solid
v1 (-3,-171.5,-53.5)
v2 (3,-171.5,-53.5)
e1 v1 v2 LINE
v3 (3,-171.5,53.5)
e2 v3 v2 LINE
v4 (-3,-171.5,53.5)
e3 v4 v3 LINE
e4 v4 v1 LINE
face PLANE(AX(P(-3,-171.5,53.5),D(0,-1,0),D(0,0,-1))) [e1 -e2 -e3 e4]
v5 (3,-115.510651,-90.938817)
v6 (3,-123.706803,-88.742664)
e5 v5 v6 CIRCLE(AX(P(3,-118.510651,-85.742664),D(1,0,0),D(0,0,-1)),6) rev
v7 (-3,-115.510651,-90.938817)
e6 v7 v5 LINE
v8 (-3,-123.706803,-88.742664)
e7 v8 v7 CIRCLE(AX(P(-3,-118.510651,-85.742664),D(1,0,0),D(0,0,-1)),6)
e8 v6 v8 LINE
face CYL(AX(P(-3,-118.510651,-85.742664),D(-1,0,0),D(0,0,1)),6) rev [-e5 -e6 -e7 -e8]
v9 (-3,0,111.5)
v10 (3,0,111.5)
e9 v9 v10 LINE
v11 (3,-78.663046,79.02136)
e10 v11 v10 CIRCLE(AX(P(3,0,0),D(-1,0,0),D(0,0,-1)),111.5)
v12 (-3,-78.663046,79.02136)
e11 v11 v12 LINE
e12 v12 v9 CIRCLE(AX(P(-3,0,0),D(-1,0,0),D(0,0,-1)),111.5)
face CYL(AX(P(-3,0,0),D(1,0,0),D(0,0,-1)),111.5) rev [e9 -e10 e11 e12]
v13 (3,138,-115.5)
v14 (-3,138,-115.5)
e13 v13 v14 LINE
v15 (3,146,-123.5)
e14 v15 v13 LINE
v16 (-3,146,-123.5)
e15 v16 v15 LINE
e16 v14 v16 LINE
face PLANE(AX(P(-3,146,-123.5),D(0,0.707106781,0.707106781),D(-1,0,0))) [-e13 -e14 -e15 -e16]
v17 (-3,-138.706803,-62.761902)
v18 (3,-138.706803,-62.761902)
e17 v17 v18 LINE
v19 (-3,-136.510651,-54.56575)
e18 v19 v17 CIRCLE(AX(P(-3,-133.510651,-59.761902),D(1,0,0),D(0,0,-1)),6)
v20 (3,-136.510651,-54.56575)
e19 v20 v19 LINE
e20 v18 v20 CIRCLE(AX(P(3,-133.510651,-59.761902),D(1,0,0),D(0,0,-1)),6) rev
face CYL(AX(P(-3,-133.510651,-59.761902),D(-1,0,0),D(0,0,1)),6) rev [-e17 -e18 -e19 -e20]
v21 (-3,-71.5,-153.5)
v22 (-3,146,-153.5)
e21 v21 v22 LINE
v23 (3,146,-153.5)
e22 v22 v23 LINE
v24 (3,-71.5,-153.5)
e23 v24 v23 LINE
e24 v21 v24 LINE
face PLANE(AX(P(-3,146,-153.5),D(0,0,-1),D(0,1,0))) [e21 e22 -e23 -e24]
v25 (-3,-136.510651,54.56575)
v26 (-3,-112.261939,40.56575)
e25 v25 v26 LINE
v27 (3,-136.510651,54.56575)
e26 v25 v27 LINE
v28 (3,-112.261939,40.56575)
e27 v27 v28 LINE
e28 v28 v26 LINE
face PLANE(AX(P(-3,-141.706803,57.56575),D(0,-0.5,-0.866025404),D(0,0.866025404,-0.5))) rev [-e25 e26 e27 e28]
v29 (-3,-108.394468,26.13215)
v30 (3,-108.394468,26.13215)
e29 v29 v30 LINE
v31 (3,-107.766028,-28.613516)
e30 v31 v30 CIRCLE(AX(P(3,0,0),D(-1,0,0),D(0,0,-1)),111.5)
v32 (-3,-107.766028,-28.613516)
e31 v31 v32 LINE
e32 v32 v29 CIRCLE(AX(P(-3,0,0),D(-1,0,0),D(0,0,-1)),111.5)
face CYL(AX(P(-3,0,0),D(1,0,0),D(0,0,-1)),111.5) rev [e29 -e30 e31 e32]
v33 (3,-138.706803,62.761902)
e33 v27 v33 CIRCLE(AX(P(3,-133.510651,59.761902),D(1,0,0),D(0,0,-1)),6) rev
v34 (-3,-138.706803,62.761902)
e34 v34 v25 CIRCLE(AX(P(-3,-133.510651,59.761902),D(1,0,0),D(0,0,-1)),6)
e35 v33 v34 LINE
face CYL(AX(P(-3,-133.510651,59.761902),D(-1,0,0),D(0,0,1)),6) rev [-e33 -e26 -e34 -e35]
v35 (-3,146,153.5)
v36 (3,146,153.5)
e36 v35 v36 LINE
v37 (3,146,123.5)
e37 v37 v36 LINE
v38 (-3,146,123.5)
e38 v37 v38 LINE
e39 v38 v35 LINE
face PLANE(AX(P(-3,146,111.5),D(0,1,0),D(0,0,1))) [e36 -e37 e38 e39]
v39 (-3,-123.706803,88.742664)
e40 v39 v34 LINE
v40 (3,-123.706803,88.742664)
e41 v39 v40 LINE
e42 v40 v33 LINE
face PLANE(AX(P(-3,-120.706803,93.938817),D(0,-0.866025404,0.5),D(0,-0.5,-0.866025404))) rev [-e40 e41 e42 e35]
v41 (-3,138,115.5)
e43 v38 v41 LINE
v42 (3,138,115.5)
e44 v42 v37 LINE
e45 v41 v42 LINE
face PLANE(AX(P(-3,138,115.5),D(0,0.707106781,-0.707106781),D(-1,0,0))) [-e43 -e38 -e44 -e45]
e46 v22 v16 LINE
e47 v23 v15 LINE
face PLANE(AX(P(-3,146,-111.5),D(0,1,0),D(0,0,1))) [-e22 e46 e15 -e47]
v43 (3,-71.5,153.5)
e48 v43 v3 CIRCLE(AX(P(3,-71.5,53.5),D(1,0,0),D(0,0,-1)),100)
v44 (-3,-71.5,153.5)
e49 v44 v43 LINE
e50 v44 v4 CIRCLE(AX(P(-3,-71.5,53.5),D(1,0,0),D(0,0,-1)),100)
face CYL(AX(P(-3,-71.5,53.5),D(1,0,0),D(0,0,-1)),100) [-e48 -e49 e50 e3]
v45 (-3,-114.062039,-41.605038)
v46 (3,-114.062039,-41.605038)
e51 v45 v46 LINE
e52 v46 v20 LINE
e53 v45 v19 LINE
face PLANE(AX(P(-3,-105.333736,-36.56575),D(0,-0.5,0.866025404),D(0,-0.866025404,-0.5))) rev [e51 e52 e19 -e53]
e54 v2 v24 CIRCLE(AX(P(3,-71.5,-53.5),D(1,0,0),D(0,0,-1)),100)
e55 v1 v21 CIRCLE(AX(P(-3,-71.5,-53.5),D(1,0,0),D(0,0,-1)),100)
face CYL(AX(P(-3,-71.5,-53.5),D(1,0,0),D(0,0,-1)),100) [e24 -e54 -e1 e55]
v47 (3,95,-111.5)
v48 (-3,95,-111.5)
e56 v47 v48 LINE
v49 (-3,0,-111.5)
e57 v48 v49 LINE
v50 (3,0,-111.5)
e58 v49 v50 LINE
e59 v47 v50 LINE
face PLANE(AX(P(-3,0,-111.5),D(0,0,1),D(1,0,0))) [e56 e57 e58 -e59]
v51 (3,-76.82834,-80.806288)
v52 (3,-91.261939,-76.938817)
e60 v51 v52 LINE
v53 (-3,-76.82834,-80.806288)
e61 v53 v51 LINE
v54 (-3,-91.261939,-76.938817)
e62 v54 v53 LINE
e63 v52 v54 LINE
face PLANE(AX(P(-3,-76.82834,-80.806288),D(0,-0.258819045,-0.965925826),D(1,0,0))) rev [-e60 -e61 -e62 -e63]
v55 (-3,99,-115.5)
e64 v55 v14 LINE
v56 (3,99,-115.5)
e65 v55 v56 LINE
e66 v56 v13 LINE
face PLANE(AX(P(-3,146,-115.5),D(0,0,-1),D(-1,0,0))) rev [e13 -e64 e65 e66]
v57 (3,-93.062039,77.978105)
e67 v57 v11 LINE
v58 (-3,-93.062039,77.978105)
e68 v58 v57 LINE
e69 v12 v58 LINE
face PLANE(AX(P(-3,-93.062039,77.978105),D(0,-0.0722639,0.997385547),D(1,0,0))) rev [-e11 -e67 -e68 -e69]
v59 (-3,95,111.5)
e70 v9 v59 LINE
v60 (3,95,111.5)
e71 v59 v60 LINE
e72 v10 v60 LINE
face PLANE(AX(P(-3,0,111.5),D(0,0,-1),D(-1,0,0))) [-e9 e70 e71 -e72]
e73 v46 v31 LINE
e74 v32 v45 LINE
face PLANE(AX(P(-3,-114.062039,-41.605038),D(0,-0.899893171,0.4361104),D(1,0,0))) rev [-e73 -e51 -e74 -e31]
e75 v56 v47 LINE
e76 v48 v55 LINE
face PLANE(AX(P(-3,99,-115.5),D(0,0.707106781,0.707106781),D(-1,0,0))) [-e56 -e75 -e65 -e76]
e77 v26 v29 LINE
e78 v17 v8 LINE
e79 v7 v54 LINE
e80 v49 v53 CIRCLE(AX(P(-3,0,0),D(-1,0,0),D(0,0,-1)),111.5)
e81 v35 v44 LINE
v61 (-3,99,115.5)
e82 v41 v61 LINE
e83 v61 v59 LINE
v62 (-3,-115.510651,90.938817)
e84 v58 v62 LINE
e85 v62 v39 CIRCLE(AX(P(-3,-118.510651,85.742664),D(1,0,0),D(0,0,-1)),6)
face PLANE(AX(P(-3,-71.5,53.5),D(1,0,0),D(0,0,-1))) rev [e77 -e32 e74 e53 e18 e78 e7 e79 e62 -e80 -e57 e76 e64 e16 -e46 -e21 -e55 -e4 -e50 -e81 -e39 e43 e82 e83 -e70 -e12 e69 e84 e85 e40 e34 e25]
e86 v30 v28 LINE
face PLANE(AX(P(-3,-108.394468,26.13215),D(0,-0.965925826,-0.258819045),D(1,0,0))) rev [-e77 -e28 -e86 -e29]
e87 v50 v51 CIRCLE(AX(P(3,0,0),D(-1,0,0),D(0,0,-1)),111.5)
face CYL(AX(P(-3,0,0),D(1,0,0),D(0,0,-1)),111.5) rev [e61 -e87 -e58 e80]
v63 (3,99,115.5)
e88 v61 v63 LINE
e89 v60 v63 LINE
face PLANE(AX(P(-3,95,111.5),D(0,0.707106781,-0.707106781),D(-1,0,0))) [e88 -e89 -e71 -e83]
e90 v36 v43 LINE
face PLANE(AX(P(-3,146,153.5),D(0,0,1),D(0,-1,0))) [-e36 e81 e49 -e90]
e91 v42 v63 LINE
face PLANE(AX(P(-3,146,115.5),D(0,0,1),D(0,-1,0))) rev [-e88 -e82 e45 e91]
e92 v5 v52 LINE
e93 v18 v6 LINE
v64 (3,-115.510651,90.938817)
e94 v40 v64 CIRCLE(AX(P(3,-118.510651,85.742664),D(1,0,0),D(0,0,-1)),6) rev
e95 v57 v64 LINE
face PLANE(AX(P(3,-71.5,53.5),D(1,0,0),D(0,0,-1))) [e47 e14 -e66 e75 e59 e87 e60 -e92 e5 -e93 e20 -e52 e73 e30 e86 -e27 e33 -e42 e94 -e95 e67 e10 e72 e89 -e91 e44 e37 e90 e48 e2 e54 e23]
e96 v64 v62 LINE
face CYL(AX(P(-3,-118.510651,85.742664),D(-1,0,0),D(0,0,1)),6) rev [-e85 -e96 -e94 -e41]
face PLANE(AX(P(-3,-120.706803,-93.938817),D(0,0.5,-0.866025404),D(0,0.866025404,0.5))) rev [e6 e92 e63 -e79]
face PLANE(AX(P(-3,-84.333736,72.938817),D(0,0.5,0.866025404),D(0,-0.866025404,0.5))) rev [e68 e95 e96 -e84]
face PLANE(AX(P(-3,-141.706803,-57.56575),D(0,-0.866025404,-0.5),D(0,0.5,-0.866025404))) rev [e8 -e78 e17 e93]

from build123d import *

# Parameters (mm, degrees)
SM_START                 = -3
SM_BASE_FLANGE_1_DEPTH   = 6
CUT_EXTRUDE_1_DEPTH      = 231.181450165
CUT_EXTRUDE_1_DEPTH_BACK = 231.181450165
SKETCH_7_W               = 4
SKETCH_7_H               = 47
CHAMFER_2_SIZE           = 8
CHAMFER_2_SIZE_2         = 10.078576046
FILLET_1_R               = 6
CHAMFER_3_SIZE           = 4


with BuildPart() as part:
    # Базовая кромка1: read off the stored shape, not the designer's step
    # Базовая кромка1 outline → Базовая кромка1 (new body)
    with BuildSketch(Plane(origin=(0, 0, 0), x_dir=(0, 0, -1), z_dir=(1, 0, 0)).offset(SM_START)):
        with BuildLine():
            Line((-111.5, 0), (-111.5, 146))
            Line((-111.5, 146), (-153.5, 146))
            Line((-153.5, 146), (-153.5, -71.5))
            ThreePointArc((-153.5, -71.5), (-124.210678119, -142.210678119), (-53.5, -171.5))
            Line((-53.5, -171.5), (53.5, -171.5))
            ThreePointArc((53.5, -171.5), (124.210678119, -142.210678119), (153.5, -71.5))
            Line((153.5, -71.5), (153.5, 146))
            Line((153.5, 146), (111.5, 146))
            Line((111.5, 146), (111.5, 0))
            ThreePointArc((111.5, 0), (0, -111.5), (-111.5, 0))
        make_face()
    extrude(amount=SM_BASE_FLANGE_1_DEPTH)

    # Эскиз7 → Вырез-Вытянуть1 (cut, two sides: drawn at the far end of the back side and taken through both)
    with BuildSketch(Plane(origin=(0, 0, 0), x_dir=(0, 0, -1), z_dir=(1, 0, 0)).offset(-CUT_EXTRUDE_1_DEPTH_BACK)):
        Polygon((72.938816537, -84.333736086), (36.565749578, -105.333736086), (57.565749578, -141.706803045), (93.938816537, -120.706803045), align=None)
        Polygon((-72.938816537, -84.333736086), (-93.938816537, -120.706803045), (-57.565749578, -141.706803045), (-36.565749578, -105.333736086), align=None)
        with Locations((-113.5, 122.5)):
            Rectangle(SKETCH_7_W, SKETCH_7_H)
        with Locations((113.5, 122.5)):
            Rectangle(SKETCH_7_W, SKETCH_7_H)
    extrude(amount=CUT_EXTRUDE_1_DEPTH + CUT_EXTRUDE_1_DEPTH_BACK, mode=Mode.SUBTRACT)

    # Фаска2
    # the kernel refuses this chamfer: 10.078576046, 8 mm, written as the material it takes off along each edge
    with BuildSketch(Plane(origin=(23.573463904, 146, -115.5), x_dir=(0, -1, 0), z_dir=(-1, 0, 0))) as chamfer_2_piece_1:
        Polygon((CHAMFER_2_SIZE, 0), (0, -CHAMFER_2_SIZE), (0, 0), align=None)
    extrude(amount=47.146927807, mode=Mode.SUBTRACT)
    with BuildSketch(Plane(origin=(-23.573463904, 146, 115.5), x_dir=(0, 0, 1), z_dir=(1, 0, 0))) as chamfer_2_piece_2:
        Polygon((CHAMFER_2_SIZE, 0), (0, CHAMFER_2_SIZE), (0, 0), align=None)
    extrude(amount=47.146927807, mode=Mode.SUBTRACT)
    with BuildSketch(Plane(origin=(31.048807118, -84.333736086, -72.938816537), x_dir=(0, -0.8660254037844384, -0.5000000000000006), z_dir=(-1, 0, 0)), Plane(origin=(31.048807118, -105.333736086, 36.565749578), x_dir=(0, -0.8660254037844385, 0.5000000000000004), z_dir=(-1, 0, 0))) as chamfer_2_piece_3:
        with BuildLine():
            Line((CHAMFER_2_SIZE, 0), (-2.56612789, -10.56612789))
            ThreePointArc((-2.56612789, -10.56612789), (-1.195031672, -5.481970258), (0, 0))
            Line((0, 0), (CHAMFER_2_SIZE, 0))
        make_face()
    extrude(amount=62.097614236, mode=Mode.SUBTRACT)
    with BuildSketch(Plane(origin=(-29.036718462, -105.333736086, -36.565749578), x_dir=(0, -0.2924871420802376, 0.9562694556022036), z_dir=(1, 0, 0))) as chamfer_2_piece_4:
        with BuildLine():
            Line((8.31589202, 0), (-CHAMFER_2_SIZE_2 * 0.224833432478, CHAMFER_2_SIZE_2 * 0.974397212447))
            Line((-CHAMFER_2_SIZE_2 * 0.224833432478, CHAMFER_2_SIZE_2 * 0.974397212447), (0, 0))
            ThreePointArc((0, 0), (4.305979523, 0.077455676), (8.31589202, 0))
        make_face()
    extrude(amount=58.073436924, mode=Mode.SUBTRACT)
    with BuildSketch(Plane(origin=(29.036718462, -84.333736086, 72.938816537), x_dir=(0, 0.6819100703745066, 0.7314360231228946), z_dir=(-1, 0, 0))) as chamfer_2_piece_5:
        with BuildLine():
            Line((8.31589202, 0), (-CHAMFER_2_SIZE_2 * 0.224833432478, -CHAMFER_2_SIZE_2 * 0.974397212447))
            Line((-CHAMFER_2_SIZE_2 * 0.224833432478, -CHAMFER_2_SIZE_2 * 0.974397212447), (0, 0))
            ThreePointArc((0, 0), (4.305979523, -0.077455676), (8.31589202, 0))
        make_face()
    extrude(amount=58.073436924, mode=Mode.SUBTRACT)

    # Скругление1
    fillet_1_edges = [part.edges().sort_by_distance(p)[0] for p in [
        (0, -120.706803045, -93.938816537),
        (0, -141.706803045, -57.565749578),
        (0, -141.706803045, 57.565749578),
        (0, -120.706803045, 93.938816537),
    ]]
    fillet(fillet_1_edges, radius=FILLET_1_R)

    # Фаска3
    chamfer_3_edges = [part.edges().sort_by_distance(p)[0] for p in [
        (0, 99, -111.5),
        (0, 99, 111.5),
    ]]
    chamfer(chamfer_3_edges, length=CHAMFER_3_SIZE - 0.0001)  # a hair under: the kernel refuses the full size


solid = part.part
